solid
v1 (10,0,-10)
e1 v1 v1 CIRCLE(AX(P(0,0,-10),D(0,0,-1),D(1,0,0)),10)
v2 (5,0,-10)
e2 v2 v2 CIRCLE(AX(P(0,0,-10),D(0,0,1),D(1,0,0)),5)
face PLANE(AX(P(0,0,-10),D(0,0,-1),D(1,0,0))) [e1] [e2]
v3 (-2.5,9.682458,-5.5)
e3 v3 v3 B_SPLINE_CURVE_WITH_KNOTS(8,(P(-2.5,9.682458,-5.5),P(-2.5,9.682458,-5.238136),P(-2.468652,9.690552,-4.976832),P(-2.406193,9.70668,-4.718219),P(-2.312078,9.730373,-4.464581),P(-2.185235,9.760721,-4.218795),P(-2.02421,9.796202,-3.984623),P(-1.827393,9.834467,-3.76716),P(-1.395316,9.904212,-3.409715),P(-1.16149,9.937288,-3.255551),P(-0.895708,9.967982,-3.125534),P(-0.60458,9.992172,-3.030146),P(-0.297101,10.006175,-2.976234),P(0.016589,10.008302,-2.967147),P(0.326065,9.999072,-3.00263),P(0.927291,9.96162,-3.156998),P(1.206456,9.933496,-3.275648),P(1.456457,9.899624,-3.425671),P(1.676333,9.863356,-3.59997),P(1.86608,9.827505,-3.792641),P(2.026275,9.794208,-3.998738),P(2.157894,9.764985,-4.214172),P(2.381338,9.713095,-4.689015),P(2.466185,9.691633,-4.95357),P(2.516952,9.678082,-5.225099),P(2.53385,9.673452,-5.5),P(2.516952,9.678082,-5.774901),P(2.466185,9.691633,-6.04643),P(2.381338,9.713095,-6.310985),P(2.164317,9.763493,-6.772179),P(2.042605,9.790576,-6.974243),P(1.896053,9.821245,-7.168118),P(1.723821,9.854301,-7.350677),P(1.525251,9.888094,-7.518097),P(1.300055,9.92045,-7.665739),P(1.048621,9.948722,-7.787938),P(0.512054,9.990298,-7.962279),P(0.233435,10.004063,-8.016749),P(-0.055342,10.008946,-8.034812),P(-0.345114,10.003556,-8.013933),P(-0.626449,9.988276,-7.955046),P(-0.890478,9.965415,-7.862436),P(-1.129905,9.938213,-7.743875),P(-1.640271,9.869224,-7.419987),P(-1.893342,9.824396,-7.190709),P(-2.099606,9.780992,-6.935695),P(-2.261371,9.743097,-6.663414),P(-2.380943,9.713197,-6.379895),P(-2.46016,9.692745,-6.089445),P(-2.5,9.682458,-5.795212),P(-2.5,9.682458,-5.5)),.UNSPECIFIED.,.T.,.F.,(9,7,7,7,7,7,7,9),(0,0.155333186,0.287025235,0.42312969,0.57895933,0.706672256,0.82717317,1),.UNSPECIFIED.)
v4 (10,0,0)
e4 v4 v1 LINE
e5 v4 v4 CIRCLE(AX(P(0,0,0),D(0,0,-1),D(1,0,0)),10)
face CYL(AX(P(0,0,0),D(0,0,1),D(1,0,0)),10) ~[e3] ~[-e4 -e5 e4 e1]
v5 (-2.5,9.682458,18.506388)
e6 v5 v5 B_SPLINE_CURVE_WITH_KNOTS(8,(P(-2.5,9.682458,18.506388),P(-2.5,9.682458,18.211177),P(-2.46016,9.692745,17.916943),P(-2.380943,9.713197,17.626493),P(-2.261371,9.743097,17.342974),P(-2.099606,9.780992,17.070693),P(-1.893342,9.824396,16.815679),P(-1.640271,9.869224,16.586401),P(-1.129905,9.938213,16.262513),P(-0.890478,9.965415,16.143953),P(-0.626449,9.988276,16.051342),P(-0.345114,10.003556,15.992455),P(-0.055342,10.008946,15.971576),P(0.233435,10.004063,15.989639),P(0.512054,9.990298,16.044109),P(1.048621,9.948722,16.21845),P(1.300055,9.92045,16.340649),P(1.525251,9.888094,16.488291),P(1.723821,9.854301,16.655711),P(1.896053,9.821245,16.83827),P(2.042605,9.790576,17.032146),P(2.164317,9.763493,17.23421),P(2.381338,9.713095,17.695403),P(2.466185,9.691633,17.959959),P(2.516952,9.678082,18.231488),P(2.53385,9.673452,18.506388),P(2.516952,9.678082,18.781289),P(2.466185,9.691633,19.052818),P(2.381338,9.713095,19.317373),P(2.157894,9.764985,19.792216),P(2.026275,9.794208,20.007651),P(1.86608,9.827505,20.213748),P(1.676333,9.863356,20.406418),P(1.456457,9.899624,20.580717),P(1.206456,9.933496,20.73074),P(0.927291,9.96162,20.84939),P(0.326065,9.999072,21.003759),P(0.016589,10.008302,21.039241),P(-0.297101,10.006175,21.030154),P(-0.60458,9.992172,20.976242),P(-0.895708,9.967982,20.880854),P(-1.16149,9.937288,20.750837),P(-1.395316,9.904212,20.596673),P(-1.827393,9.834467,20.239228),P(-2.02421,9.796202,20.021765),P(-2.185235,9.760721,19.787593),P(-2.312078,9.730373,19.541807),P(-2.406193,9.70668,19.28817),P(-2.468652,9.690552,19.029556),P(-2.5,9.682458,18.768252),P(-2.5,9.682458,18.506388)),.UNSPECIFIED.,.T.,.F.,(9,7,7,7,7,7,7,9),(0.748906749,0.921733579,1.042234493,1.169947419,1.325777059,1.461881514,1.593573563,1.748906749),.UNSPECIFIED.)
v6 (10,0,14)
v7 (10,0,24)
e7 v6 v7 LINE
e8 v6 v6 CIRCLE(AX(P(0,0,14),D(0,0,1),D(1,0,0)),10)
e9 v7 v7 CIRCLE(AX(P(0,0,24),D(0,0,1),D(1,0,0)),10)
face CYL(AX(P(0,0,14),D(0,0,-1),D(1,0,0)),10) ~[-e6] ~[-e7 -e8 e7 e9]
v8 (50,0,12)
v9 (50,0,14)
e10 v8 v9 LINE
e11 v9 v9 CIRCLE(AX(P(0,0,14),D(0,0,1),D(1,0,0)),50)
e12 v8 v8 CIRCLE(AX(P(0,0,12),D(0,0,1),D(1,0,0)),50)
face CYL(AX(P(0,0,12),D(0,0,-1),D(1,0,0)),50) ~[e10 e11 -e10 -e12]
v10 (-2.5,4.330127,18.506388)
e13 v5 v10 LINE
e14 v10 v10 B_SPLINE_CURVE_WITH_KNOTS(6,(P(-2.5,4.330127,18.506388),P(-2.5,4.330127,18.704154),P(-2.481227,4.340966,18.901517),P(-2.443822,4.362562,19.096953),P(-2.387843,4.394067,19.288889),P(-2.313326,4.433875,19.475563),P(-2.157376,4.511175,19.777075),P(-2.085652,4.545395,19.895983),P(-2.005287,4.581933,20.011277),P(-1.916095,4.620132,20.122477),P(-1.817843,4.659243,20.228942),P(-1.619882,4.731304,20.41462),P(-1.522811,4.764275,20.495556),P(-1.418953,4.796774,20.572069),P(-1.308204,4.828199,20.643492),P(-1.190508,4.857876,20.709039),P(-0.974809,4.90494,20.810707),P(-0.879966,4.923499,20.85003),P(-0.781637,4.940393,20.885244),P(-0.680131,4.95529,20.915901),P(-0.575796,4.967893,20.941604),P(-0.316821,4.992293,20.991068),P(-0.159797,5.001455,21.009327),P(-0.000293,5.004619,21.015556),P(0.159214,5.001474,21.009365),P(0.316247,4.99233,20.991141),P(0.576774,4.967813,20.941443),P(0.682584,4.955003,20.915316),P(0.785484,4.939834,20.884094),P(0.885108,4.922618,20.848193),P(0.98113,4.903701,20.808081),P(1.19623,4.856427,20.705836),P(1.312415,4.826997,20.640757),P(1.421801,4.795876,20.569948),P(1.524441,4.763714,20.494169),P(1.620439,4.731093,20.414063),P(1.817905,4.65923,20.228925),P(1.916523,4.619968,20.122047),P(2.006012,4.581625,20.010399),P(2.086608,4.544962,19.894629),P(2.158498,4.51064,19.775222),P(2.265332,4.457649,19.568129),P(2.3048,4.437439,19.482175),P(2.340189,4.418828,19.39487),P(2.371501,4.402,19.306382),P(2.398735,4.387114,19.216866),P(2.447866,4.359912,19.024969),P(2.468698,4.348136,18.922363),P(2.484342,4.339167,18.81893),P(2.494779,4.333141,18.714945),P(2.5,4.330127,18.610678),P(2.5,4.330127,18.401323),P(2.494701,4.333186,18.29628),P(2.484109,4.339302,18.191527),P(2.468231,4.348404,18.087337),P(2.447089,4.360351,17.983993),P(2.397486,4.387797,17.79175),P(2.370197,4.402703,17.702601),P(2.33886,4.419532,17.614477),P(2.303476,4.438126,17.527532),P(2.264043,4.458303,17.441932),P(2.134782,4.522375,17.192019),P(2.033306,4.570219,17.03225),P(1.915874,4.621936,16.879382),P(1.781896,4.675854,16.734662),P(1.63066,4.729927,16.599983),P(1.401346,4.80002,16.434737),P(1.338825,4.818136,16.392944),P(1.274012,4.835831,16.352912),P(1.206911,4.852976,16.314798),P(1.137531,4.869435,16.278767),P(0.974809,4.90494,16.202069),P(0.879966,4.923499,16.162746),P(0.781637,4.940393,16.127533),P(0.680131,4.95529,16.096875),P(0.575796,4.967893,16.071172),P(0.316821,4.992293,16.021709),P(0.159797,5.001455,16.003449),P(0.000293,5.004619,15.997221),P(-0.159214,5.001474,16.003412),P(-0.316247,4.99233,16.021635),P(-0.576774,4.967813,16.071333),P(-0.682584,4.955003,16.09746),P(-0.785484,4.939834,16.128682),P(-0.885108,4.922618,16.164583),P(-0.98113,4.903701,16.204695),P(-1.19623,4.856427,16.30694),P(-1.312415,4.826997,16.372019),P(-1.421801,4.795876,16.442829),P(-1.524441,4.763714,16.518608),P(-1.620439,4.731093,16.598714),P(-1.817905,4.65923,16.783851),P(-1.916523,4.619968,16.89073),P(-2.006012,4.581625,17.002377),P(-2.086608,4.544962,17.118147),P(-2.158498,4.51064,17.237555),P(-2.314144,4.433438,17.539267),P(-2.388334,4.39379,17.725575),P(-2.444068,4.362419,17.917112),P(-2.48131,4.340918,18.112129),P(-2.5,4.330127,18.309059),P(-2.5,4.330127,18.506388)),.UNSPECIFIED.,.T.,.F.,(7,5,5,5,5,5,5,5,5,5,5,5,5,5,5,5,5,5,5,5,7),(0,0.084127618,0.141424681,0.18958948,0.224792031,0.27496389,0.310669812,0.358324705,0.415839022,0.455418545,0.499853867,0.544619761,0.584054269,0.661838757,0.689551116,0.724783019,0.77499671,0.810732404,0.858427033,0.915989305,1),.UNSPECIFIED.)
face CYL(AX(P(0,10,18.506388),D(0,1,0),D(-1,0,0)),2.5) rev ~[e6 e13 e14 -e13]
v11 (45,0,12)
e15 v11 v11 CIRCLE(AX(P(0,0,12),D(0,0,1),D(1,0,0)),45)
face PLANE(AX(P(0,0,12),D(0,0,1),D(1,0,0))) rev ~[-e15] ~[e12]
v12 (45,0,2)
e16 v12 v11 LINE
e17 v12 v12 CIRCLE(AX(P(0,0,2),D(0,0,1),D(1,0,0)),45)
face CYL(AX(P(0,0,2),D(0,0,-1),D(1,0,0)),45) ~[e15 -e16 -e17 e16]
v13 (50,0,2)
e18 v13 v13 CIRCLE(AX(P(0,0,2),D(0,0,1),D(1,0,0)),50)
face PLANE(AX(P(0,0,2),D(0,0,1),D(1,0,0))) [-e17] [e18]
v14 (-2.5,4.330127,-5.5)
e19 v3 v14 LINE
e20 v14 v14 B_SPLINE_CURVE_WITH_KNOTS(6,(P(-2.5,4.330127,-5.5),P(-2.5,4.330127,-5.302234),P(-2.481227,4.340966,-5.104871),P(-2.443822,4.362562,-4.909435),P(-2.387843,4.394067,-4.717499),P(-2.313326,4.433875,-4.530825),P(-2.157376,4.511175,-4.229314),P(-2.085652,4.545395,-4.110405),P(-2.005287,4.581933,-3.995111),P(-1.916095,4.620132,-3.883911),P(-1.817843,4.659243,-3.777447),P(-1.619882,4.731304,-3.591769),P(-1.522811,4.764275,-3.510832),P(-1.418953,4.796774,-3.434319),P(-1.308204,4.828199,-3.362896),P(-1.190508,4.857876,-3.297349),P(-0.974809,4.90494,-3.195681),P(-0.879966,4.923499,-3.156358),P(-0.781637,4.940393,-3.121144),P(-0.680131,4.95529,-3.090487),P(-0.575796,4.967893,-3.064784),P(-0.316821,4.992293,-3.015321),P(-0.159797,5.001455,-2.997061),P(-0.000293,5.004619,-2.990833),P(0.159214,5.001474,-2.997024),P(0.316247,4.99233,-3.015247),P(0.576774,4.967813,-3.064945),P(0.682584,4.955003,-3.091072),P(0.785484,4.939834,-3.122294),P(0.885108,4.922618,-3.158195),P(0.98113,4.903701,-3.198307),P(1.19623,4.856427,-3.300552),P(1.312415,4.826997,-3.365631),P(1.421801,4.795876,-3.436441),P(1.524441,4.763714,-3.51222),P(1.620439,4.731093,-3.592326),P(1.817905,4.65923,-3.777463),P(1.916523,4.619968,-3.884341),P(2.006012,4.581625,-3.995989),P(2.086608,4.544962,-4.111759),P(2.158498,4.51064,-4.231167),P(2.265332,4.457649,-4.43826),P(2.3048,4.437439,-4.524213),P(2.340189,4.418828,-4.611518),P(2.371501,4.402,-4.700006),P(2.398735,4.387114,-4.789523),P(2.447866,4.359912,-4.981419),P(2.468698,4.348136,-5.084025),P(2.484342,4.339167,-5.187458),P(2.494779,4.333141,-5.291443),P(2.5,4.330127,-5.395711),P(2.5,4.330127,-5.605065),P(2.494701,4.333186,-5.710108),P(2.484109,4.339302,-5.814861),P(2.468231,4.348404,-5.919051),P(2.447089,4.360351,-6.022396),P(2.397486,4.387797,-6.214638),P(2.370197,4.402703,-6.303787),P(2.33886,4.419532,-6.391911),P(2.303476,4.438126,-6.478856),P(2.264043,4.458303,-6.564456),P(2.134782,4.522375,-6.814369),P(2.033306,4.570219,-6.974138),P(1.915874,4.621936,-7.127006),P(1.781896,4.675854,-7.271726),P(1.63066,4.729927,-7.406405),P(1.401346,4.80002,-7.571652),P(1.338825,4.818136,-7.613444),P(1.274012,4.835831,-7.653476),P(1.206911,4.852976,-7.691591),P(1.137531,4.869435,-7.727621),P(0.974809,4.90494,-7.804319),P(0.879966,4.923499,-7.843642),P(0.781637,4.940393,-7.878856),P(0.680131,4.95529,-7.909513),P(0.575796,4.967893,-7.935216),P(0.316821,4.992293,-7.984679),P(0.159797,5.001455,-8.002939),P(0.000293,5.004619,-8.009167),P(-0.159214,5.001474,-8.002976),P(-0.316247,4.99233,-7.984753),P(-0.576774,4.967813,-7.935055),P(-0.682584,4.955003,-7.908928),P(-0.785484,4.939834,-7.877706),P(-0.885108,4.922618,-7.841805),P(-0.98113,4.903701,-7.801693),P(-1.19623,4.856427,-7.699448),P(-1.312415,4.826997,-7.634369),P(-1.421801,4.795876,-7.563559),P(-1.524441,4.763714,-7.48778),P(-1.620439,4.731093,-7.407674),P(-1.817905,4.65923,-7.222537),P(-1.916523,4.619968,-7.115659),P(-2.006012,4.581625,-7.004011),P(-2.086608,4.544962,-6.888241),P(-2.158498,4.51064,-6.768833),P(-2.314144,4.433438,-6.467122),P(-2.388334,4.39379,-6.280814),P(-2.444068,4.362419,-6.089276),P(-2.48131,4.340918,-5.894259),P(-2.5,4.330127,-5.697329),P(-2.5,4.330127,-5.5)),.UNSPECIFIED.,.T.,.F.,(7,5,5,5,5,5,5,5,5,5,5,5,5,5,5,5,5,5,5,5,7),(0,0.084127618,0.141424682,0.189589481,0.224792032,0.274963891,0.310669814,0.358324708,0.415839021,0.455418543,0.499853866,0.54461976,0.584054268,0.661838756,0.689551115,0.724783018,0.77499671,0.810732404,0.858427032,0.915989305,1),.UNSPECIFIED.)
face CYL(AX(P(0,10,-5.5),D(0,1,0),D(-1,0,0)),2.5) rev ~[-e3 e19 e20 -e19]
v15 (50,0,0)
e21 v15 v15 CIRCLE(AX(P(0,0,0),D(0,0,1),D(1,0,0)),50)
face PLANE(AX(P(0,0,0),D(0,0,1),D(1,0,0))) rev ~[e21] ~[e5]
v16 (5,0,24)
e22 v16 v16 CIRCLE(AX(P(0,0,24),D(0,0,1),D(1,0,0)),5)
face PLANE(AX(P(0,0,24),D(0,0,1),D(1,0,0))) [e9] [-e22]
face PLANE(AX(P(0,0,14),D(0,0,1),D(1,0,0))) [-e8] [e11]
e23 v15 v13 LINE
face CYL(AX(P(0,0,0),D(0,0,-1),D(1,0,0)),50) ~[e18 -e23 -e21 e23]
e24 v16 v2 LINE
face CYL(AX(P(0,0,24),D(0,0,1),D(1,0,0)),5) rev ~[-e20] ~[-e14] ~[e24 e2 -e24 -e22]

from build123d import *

# Parameters (mm, degrees)
F0_R      = 50
F1_DEPTH  = 2
F2_R      = 45
F3_DEPTH  = 10
F4_R      = 50
F4_R_2    = 45
F5_DEPTH  = 2
F6_R      = 10
F7_DEPTH  = 10
F8_R      = 10
F9_DEPTH  = 10
F10_R     = 5
F11_DEPTH = 34.001
F14_R     = 2.5
F15_DEPTH = 6.6698730813


with BuildPart() as f1:
    # F0 (on Top) → F1 (new body)
    with BuildSketch(Plane.XY):
        Circle(F0_R)
    extrude(amount=F1_DEPTH)

    # F2 (on face) → F3 (join)
    with BuildSketch(Plane.XY.offset(2)):
        Circle(F2_R)
    extrude(amount=F3_DEPTH)

    # F4 (on face) → F5 (join)
    with BuildSketch(Plane.XY.offset(12)):
        Circle(F4_R)
        Circle(F4_R_2, mode=Mode.SUBTRACT)
        Circle(F4_R_2)
    extrude(amount=F5_DEPTH)

    # F6 (on face) → F7 (join)
    with BuildSketch(Plane.XY.offset(14)):
        Circle(F6_R)
    extrude(amount=F7_DEPTH)

    # F8 (on face) → F9 (join)
    with BuildSketch(Plane(origin=(0, 0, 0), x_dir=(1, 0, 0), z_dir=(0, 0, -1))):
        Circle(F8_R)
    extrude(amount=F9_DEPTH)

    # F10 (on face) → F11 (cut, through all)
    with BuildSketch(Plane.XY.offset(24)):
        Circle(F10_R)
    extrude(amount=-F11_DEPTH, mode=Mode.SUBTRACT)

    # F14 (on face) → F15 (cut, up to face)
    with BuildSketch(Plane(origin=(0, 10, 0), x_dir=(-1, 0, 0), z_dir=(0, 1, 0))):
        with Locations((0, 18.5063882234)):
            Circle(F14_R)
        with Locations((0, -5.5)):
            Circle(F14_R)
    extrude(amount=-F15_DEPTH, mode=Mode.SUBTRACT)


solid = f1.part
